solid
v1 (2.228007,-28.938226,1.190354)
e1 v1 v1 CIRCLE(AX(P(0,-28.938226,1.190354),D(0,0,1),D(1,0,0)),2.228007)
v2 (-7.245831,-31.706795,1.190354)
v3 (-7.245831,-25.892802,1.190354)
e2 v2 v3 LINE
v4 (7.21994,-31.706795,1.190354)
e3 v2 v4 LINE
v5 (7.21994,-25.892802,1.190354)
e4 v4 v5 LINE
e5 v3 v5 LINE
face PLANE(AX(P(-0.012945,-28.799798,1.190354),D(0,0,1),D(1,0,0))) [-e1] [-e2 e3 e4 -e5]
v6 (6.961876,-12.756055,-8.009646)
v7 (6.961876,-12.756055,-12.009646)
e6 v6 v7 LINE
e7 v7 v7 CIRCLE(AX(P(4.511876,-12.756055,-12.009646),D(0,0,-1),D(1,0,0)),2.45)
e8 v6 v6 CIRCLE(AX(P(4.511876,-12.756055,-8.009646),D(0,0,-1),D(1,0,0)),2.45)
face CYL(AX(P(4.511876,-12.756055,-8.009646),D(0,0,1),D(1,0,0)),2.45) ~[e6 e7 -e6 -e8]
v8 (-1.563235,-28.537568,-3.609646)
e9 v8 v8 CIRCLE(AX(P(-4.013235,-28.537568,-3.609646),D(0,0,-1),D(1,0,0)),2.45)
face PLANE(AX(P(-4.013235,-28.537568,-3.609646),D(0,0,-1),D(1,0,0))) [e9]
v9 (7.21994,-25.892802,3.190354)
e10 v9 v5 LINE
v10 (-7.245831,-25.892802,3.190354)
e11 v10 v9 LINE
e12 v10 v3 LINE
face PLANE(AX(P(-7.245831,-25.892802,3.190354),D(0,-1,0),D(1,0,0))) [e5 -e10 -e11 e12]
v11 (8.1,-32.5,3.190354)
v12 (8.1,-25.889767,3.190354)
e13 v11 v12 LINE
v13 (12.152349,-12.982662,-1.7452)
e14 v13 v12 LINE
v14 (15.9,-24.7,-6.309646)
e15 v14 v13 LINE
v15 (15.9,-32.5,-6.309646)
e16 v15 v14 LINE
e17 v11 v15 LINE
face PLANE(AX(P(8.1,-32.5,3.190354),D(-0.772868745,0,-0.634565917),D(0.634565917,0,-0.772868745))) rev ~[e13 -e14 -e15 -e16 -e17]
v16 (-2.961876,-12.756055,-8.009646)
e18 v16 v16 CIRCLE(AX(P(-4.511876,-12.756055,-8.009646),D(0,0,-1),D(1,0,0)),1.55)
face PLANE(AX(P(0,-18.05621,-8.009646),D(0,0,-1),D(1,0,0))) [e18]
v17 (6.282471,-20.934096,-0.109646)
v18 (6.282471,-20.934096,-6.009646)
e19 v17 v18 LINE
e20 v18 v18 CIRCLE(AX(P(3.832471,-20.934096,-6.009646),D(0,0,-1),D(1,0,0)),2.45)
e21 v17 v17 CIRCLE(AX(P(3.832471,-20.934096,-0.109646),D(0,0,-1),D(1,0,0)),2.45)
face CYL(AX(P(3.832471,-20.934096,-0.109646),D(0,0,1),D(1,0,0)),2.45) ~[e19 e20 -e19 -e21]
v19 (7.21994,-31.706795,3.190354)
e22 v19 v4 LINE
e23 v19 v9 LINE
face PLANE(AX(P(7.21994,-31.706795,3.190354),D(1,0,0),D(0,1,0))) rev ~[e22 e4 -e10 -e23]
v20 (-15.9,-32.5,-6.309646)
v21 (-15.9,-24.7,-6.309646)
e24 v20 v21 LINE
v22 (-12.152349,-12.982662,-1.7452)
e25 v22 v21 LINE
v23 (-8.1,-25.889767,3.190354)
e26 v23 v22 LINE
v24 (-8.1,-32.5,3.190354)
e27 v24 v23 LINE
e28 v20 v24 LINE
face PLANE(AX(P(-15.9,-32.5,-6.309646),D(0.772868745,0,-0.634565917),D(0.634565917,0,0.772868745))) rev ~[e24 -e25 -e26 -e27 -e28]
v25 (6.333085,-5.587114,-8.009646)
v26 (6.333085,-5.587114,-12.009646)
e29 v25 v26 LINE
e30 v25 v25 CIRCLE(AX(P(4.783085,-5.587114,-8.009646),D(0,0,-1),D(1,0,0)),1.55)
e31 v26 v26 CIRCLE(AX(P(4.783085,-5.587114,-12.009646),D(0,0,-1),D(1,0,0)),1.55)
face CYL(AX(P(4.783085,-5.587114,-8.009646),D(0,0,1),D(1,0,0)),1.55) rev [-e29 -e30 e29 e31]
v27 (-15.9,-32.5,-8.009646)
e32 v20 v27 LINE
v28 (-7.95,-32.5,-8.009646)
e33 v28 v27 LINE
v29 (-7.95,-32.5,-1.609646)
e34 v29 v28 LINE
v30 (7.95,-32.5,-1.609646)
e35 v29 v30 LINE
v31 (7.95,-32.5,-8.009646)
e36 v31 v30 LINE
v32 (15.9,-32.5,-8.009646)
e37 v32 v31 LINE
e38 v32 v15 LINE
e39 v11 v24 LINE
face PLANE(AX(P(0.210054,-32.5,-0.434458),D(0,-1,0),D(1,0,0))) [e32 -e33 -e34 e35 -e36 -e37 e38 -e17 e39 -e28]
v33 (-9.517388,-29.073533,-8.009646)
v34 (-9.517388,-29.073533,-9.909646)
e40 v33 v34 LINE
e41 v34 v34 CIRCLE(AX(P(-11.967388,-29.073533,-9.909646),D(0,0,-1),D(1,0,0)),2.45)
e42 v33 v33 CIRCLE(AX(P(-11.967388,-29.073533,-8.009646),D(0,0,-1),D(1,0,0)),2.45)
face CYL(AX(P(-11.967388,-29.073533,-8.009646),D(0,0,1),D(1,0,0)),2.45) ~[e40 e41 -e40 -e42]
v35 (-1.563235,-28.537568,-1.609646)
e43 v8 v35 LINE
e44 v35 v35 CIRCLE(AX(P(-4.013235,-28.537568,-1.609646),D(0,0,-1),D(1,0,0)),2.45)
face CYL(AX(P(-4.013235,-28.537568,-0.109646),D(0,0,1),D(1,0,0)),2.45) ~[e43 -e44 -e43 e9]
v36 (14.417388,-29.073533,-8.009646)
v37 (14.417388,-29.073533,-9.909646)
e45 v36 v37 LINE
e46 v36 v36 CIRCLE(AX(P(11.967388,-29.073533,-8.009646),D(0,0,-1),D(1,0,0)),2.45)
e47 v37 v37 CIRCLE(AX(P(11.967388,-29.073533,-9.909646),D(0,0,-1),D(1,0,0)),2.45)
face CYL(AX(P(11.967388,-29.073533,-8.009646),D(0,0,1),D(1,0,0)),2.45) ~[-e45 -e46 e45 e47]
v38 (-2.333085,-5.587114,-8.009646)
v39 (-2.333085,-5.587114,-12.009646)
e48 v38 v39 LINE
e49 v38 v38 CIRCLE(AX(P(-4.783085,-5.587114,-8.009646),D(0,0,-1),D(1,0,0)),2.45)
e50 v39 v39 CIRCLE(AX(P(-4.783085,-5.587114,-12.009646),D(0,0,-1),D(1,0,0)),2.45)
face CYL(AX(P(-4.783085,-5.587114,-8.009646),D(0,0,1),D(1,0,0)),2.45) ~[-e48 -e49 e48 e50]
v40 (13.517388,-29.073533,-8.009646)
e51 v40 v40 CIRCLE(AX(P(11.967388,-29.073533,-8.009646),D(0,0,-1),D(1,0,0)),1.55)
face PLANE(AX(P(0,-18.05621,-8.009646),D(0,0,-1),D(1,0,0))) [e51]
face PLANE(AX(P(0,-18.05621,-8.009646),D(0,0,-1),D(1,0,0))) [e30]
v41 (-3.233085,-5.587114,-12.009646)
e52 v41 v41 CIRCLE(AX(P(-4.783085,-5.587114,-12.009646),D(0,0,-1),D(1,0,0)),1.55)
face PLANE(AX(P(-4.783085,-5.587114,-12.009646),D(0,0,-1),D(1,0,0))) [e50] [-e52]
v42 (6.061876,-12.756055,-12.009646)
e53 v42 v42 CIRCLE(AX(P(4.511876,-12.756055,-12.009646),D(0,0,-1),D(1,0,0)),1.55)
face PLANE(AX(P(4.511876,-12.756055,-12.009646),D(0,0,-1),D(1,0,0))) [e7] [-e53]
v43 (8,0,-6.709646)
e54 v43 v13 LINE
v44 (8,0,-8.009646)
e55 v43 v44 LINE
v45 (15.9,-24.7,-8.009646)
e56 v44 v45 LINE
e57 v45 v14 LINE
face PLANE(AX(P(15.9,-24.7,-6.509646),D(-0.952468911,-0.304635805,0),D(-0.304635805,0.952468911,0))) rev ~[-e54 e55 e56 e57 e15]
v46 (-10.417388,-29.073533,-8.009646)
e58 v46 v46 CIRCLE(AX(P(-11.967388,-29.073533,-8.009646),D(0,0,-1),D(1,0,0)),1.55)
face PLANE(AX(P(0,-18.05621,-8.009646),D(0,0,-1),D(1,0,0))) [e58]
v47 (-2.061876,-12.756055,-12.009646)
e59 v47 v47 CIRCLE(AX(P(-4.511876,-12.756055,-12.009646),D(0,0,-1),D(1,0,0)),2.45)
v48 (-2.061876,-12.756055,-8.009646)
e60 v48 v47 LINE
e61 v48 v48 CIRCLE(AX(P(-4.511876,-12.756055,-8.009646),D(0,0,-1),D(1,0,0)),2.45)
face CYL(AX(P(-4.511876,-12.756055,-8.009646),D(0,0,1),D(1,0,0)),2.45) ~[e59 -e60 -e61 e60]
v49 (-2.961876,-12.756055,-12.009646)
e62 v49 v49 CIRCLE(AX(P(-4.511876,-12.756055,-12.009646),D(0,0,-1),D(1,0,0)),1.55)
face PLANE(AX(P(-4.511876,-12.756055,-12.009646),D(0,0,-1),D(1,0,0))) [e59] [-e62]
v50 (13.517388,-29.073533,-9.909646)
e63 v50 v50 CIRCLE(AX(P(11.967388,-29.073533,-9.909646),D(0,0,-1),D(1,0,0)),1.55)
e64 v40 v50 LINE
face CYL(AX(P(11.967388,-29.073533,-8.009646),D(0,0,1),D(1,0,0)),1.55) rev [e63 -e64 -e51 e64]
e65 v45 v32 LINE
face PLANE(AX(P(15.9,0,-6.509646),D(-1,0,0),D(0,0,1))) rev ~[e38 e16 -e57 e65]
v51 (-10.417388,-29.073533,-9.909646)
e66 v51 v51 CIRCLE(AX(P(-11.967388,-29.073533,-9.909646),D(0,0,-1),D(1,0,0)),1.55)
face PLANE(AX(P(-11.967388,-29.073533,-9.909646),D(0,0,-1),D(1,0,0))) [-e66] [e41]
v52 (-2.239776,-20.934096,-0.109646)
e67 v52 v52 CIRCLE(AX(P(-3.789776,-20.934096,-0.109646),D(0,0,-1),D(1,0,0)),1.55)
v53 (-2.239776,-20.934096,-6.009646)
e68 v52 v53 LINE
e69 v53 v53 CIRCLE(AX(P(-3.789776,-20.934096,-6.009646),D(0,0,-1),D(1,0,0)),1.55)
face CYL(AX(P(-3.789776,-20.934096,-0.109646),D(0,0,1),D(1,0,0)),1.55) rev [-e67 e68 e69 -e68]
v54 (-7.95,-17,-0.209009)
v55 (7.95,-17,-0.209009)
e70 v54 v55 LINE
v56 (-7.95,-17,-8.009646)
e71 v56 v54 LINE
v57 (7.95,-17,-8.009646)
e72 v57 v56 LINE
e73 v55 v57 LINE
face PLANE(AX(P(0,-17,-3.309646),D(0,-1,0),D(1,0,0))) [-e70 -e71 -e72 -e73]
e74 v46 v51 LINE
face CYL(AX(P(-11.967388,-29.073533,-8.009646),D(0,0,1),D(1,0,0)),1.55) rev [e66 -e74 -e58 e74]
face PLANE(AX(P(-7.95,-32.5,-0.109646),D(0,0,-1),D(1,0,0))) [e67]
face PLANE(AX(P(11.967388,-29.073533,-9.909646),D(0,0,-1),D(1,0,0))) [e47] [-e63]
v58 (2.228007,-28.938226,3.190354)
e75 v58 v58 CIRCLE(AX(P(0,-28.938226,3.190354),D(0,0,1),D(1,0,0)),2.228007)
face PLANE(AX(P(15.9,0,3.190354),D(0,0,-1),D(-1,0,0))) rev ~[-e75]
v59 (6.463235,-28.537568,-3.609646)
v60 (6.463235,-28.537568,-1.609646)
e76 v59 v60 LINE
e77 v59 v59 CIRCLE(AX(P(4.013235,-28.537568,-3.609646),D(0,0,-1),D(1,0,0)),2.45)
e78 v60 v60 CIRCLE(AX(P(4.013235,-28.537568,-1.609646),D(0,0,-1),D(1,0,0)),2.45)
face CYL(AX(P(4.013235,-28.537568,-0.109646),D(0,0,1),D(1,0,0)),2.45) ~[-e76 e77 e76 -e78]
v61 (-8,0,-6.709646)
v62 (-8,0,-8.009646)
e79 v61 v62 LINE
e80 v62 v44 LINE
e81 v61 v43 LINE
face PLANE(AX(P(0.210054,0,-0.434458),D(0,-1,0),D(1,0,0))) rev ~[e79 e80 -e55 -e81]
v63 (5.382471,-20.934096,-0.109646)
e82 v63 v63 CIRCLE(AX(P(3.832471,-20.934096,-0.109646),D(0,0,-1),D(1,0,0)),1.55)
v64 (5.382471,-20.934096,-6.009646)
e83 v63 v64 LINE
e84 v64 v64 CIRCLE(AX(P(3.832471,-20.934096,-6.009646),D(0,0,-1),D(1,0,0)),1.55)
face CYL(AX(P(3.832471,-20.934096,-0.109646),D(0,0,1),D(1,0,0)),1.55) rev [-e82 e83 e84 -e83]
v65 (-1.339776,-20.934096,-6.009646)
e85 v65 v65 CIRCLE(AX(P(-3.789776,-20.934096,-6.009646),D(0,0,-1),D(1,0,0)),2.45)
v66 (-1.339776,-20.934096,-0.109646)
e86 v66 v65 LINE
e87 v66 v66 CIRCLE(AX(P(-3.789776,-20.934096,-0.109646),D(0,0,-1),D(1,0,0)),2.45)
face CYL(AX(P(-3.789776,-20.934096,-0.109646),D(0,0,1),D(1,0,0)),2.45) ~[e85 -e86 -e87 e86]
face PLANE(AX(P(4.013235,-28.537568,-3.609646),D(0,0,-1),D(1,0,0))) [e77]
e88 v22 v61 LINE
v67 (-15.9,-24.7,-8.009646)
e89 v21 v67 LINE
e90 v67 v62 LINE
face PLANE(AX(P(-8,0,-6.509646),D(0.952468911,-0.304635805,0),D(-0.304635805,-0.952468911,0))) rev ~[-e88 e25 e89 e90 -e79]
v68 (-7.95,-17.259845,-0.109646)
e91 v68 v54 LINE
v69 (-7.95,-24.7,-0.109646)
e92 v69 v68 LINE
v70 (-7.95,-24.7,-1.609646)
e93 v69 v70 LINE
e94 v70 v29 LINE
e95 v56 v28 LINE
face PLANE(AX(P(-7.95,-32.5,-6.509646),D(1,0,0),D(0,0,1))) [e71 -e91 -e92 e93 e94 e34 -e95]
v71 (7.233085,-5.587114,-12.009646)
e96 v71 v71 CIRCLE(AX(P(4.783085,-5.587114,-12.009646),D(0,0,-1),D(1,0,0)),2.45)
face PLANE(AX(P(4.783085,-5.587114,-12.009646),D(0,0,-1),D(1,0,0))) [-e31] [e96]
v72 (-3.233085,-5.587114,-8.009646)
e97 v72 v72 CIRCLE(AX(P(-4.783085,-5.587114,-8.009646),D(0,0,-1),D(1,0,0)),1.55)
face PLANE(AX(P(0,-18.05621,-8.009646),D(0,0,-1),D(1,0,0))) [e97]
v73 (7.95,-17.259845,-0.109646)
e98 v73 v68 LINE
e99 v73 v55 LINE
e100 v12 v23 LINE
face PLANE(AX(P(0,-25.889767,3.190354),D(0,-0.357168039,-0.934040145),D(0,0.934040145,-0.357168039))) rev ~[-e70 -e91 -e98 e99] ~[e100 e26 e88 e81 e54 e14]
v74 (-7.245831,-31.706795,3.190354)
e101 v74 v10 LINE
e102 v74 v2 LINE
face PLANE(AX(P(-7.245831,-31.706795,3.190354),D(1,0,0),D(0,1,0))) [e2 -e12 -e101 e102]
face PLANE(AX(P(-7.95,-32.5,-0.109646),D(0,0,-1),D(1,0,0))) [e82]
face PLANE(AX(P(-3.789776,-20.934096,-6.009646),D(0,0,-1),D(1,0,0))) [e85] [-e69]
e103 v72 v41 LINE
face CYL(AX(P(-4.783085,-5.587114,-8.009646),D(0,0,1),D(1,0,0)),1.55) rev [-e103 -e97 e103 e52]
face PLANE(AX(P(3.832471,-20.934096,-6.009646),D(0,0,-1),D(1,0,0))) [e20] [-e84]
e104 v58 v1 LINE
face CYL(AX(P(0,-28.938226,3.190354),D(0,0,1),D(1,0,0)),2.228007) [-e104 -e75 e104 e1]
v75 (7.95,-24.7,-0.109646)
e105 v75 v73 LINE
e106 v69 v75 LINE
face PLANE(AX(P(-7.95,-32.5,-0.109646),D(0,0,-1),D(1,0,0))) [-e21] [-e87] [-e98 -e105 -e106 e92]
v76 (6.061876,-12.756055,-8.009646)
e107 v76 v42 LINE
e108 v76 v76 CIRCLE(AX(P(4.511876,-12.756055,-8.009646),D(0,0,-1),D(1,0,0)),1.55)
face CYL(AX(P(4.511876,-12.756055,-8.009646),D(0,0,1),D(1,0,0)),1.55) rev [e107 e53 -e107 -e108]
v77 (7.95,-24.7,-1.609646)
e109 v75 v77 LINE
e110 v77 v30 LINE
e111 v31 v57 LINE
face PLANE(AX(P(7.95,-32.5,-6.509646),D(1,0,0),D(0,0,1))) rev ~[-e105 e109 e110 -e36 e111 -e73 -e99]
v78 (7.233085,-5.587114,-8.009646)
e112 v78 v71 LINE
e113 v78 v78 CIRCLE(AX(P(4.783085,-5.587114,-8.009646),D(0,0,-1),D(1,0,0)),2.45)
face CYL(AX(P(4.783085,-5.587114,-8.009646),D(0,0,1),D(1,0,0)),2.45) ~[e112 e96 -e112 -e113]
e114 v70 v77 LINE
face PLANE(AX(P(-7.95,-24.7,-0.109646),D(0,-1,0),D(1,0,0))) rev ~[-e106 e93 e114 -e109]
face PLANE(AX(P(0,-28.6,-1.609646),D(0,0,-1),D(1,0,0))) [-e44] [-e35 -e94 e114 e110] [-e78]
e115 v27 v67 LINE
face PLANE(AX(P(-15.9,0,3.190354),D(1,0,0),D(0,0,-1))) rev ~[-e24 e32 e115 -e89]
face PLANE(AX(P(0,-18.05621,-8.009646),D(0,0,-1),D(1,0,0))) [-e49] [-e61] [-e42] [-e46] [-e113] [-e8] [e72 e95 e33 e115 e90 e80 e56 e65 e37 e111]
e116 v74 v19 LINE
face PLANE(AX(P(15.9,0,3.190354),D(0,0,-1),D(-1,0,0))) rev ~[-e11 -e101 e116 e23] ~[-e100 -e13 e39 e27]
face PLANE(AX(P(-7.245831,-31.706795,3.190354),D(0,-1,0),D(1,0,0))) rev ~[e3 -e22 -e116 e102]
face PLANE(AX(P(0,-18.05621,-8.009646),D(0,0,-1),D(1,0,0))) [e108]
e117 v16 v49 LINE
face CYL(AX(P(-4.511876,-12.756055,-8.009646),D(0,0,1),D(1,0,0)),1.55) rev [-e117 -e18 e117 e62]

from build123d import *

# Parameters (mm, degrees)
F0_W      = 15.96
F0_H      = 8.3576925244
F1_DEPTH  = 32.5
F2_W      = 15.9
F2_H      = 6.4
F3_DEPTH  = 15.5
F4_DEPTH  = 70
F6_DEPTH  = 25
F7_R      = 2.45
F8_DEPTH  = 2
F7_W      = 15.9
F7_H      = 7.8
F8_FACE_R = 2.45
F9_DEPTH  = 1.5
F10_R     = 2.45
F10_R_2   = 1.55
F11_DEPTH = 5.9
F12_R     = 2.45
F12_R_2   = 1.55
F13_DEPTH = 1.9
F14_DEPTH = 4
F15_DEPTH = 4
F16_W     = 14.4657706842
F16_H     = 5.8139935136
F16_R     = 2.228006958
F17_DEPTH = 2
F19_DEPTH = 12.5


with BuildPart() as f1:
    # F0 (on Front) → F1 (new body)
    with BuildSketch(Plane.XZ):
        Polygon((15.9, 3.1903535793), (-15.9, 3.1903535793), (-15.9, -6.5096464207), (-6.726923441, -6.5096464207), (-6.726923441, 1.8480461037), (9.233076559, 1.8480461037), (9.233076559, -6.5096464207), (15.9, -6.5096464207), align=None)
        with Locations((1.253076559, -2.3308001585)):
            Rectangle(F0_W, F0_H)
    extrude(amount=F1_DEPTH)

    # F2 (on face) → F3 (cut)
    with BuildSketch(Plane.XZ.offset(32.5)):
        with Locations((0, -3.3096464207)):
            Rectangle(F2_W, F2_H)
    extrude(amount=-F3_DEPTH, mode=Mode.SUBTRACT)

    # F2 (on face) → F4 (cut)
    with BuildSketch(Plane.XZ.offset(32.5)):
        Polygon((-15.9, 3.1903535793), (-15.9, -6.3096464207), (-8.1, 3.1903535793), align=None)
        Polygon((8.1, 3.1903535793), (15.9, -6.3096464207), (15.9, 3.1903535793), align=None)
    extrude(amount=-F4_DEPTH, mode=Mode.SUBTRACT)

    # F5 (on face) → F6 (cut)
    with BuildSketch(Plane(origin=(0, 0, -6.5096464207), x_dir=(1, 0, 0), z_dir=(0, 0, -1))):
        Polygon((-8, 0), (-15.9, 24.7), (-15.9, 0), align=None)
        Polygon((15.9, 24.7), (8, 0), (15.9, 0), align=None)
    extrude(amount=-F6_DEPTH, mode=Mode.SUBTRACT)

    # F7 (on face) → F8 (join)
    with BuildSketch(Plane(origin=(0, 0, -0.1096464207), x_dir=(1, 0, 0), z_dir=(0, 0, -1))):
        with Locations((-4.0132352151, 28.5375677049)):
            Circle(F7_R)
        with Locations((4.0132352151, 28.5375677049)):
            Circle(F7_R)
    extrude(amount=F8_DEPTH)

    # F7 (on face) + F1_face1 (on face) + F8_face (on face) → F9 (join)
    with BuildSketch(Plane(origin=(0, 0, -0.1096464207), x_dir=(1, 0, 0), z_dir=(0, 0, -1))):
        with Locations((0, 28.6)):
            Rectangle(F7_W, F7_H)
        with Locations((-4.0132352151, 28.5375677049)):
            Circle(F7_R, mode=Mode.SUBTRACT)
        with Locations((4.0132352151, 28.5375677049)):
            Circle(F7_R, mode=Mode.SUBTRACT)
    with BuildSketch(Plane(origin=(0, -13.5883838384, -6.5096464207), x_dir=(1, 0, 0), z_dir=(0, 0, -1))):
        Polygon((-8, -13.5883838384), (8, -13.5883838384), (15.9, 11.1116161616), (15.9, 18.9116161616), (7.95, 18.9116161616), (7.95, 3.4116161616), (-7.95, 3.4116161616), (-7.95, 18.9116161616), (-15.9, 18.9116161616), (-15.9, 11.1116161616), align=None)
    with BuildSketch(Plane(origin=(-4.0132352151, -28.5375677049, -2.1096464207), x_dir=(1, 0, 0), z_dir=(0, 0, -1))):
        Circle(F8_FACE_R)
        with Locations((8.0264704302, 0)):
            Circle(F8_FACE_R)
    extrude(amount=F9_DEPTH)

    # F10 (on face) → F11 (join)
    with BuildSketch(Plane(origin=(0, 0, -0.1096464207), x_dir=(1, 0, 0), z_dir=(0, 0, -1))):
        with Locations((-3.7897760311, 20.9340956062)):
            Circle(F10_R)
        with Locations((-3.7897760311, 20.9340956062)):
            Circle(F10_R_2, mode=Mode.SUBTRACT)
        with Locations((3.8324711446, 20.9340956062)):
            Circle(F10_R)
        with Locations((3.8324711446, 20.9340956062)):
            Circle(F10_R_2, mode=Mode.SUBTRACT)
    extrude(amount=F11_DEPTH)

    # F12 (on face) → F13 (join)
    with BuildSketch(Plane(origin=(0, 0, -8.0096464207), x_dir=(1, 0, 0), z_dir=(0, 0, -1))):
        with Locations((-11.9673879817, 29.0735326707)):
            Circle(F12_R)
        with Locations((-11.9673879817, 29.0735326707)):
            Circle(F12_R_2, mode=Mode.SUBTRACT)
        with Locations((11.9673879817, 29.0735326707)):
            Circle(F12_R)
        with Locations((11.9673879817, 29.0735326707)):
            Circle(F12_R_2, mode=Mode.SUBTRACT)
    extrude(amount=F13_DEPTH)

    # F12 (on face) → F14 (join)
    with BuildSketch(Plane(origin=(0, 0, -8.0096464207), x_dir=(1, 0, 0), z_dir=(0, 0, -1))):
        with Locations((-4.5118764974, 12.756055221)):
            Circle(F12_R)
        with Locations((-4.5118764974, 12.756055221)):
            Circle(F12_R_2, mode=Mode.SUBTRACT)
        with Locations((4.5118764974, 12.756055221)):
            Circle(F12_R)
        with Locations((4.5118764974, 12.756055221)):
            Circle(F12_R_2, mode=Mode.SUBTRACT)
    extrude(amount=F14_DEPTH)

    # F12 (on face) → F15 (join)
    with BuildSketch(Plane(origin=(0, 0, -8.0096464207), x_dir=(1, 0, 0), z_dir=(0, 0, -1))):
        with Locations((-4.7830846161, 5.5871135555)):
            Circle(F12_R)
        with Locations((-4.7830846161, 5.5871135555)):
            Circle(F12_R_2, mode=Mode.SUBTRACT)
        with Locations((4.7830846161, 5.5871135555)):
            Circle(F12_R)
        with Locations((4.7830846161, 5.5871135555)):
            Circle(F12_R_2, mode=Mode.SUBTRACT)
    extrude(amount=F15_DEPTH)

    # F16 (on face) → F17 (cut)
    with BuildSketch(Plane.XY.offset(3.1903535793)):
        with Locations((-0.0129453838, -28.7997983396)):
            Rectangle(F16_W, F16_H)
        with Locations((0, -28.9382264018)):
            Circle(F16_R, mode=Mode.SUBTRACT)
    extrude(amount=-F17_DEPTH, mode=Mode.SUBTRACT)

    # F18 (on Right) → F19 (cut, symmetric)
    with BuildSketch(Plane.YZ):
        Polygon((-25.8897673339, 3.1903535793), (0, -6.7096464207), (0, 3.1903535793), (-0.3126582278, 3.1903535793), align=None)
    extrude(amount=F19_DEPTH, both=True, mode=Mode.SUBTRACT)


solid = f1.part
